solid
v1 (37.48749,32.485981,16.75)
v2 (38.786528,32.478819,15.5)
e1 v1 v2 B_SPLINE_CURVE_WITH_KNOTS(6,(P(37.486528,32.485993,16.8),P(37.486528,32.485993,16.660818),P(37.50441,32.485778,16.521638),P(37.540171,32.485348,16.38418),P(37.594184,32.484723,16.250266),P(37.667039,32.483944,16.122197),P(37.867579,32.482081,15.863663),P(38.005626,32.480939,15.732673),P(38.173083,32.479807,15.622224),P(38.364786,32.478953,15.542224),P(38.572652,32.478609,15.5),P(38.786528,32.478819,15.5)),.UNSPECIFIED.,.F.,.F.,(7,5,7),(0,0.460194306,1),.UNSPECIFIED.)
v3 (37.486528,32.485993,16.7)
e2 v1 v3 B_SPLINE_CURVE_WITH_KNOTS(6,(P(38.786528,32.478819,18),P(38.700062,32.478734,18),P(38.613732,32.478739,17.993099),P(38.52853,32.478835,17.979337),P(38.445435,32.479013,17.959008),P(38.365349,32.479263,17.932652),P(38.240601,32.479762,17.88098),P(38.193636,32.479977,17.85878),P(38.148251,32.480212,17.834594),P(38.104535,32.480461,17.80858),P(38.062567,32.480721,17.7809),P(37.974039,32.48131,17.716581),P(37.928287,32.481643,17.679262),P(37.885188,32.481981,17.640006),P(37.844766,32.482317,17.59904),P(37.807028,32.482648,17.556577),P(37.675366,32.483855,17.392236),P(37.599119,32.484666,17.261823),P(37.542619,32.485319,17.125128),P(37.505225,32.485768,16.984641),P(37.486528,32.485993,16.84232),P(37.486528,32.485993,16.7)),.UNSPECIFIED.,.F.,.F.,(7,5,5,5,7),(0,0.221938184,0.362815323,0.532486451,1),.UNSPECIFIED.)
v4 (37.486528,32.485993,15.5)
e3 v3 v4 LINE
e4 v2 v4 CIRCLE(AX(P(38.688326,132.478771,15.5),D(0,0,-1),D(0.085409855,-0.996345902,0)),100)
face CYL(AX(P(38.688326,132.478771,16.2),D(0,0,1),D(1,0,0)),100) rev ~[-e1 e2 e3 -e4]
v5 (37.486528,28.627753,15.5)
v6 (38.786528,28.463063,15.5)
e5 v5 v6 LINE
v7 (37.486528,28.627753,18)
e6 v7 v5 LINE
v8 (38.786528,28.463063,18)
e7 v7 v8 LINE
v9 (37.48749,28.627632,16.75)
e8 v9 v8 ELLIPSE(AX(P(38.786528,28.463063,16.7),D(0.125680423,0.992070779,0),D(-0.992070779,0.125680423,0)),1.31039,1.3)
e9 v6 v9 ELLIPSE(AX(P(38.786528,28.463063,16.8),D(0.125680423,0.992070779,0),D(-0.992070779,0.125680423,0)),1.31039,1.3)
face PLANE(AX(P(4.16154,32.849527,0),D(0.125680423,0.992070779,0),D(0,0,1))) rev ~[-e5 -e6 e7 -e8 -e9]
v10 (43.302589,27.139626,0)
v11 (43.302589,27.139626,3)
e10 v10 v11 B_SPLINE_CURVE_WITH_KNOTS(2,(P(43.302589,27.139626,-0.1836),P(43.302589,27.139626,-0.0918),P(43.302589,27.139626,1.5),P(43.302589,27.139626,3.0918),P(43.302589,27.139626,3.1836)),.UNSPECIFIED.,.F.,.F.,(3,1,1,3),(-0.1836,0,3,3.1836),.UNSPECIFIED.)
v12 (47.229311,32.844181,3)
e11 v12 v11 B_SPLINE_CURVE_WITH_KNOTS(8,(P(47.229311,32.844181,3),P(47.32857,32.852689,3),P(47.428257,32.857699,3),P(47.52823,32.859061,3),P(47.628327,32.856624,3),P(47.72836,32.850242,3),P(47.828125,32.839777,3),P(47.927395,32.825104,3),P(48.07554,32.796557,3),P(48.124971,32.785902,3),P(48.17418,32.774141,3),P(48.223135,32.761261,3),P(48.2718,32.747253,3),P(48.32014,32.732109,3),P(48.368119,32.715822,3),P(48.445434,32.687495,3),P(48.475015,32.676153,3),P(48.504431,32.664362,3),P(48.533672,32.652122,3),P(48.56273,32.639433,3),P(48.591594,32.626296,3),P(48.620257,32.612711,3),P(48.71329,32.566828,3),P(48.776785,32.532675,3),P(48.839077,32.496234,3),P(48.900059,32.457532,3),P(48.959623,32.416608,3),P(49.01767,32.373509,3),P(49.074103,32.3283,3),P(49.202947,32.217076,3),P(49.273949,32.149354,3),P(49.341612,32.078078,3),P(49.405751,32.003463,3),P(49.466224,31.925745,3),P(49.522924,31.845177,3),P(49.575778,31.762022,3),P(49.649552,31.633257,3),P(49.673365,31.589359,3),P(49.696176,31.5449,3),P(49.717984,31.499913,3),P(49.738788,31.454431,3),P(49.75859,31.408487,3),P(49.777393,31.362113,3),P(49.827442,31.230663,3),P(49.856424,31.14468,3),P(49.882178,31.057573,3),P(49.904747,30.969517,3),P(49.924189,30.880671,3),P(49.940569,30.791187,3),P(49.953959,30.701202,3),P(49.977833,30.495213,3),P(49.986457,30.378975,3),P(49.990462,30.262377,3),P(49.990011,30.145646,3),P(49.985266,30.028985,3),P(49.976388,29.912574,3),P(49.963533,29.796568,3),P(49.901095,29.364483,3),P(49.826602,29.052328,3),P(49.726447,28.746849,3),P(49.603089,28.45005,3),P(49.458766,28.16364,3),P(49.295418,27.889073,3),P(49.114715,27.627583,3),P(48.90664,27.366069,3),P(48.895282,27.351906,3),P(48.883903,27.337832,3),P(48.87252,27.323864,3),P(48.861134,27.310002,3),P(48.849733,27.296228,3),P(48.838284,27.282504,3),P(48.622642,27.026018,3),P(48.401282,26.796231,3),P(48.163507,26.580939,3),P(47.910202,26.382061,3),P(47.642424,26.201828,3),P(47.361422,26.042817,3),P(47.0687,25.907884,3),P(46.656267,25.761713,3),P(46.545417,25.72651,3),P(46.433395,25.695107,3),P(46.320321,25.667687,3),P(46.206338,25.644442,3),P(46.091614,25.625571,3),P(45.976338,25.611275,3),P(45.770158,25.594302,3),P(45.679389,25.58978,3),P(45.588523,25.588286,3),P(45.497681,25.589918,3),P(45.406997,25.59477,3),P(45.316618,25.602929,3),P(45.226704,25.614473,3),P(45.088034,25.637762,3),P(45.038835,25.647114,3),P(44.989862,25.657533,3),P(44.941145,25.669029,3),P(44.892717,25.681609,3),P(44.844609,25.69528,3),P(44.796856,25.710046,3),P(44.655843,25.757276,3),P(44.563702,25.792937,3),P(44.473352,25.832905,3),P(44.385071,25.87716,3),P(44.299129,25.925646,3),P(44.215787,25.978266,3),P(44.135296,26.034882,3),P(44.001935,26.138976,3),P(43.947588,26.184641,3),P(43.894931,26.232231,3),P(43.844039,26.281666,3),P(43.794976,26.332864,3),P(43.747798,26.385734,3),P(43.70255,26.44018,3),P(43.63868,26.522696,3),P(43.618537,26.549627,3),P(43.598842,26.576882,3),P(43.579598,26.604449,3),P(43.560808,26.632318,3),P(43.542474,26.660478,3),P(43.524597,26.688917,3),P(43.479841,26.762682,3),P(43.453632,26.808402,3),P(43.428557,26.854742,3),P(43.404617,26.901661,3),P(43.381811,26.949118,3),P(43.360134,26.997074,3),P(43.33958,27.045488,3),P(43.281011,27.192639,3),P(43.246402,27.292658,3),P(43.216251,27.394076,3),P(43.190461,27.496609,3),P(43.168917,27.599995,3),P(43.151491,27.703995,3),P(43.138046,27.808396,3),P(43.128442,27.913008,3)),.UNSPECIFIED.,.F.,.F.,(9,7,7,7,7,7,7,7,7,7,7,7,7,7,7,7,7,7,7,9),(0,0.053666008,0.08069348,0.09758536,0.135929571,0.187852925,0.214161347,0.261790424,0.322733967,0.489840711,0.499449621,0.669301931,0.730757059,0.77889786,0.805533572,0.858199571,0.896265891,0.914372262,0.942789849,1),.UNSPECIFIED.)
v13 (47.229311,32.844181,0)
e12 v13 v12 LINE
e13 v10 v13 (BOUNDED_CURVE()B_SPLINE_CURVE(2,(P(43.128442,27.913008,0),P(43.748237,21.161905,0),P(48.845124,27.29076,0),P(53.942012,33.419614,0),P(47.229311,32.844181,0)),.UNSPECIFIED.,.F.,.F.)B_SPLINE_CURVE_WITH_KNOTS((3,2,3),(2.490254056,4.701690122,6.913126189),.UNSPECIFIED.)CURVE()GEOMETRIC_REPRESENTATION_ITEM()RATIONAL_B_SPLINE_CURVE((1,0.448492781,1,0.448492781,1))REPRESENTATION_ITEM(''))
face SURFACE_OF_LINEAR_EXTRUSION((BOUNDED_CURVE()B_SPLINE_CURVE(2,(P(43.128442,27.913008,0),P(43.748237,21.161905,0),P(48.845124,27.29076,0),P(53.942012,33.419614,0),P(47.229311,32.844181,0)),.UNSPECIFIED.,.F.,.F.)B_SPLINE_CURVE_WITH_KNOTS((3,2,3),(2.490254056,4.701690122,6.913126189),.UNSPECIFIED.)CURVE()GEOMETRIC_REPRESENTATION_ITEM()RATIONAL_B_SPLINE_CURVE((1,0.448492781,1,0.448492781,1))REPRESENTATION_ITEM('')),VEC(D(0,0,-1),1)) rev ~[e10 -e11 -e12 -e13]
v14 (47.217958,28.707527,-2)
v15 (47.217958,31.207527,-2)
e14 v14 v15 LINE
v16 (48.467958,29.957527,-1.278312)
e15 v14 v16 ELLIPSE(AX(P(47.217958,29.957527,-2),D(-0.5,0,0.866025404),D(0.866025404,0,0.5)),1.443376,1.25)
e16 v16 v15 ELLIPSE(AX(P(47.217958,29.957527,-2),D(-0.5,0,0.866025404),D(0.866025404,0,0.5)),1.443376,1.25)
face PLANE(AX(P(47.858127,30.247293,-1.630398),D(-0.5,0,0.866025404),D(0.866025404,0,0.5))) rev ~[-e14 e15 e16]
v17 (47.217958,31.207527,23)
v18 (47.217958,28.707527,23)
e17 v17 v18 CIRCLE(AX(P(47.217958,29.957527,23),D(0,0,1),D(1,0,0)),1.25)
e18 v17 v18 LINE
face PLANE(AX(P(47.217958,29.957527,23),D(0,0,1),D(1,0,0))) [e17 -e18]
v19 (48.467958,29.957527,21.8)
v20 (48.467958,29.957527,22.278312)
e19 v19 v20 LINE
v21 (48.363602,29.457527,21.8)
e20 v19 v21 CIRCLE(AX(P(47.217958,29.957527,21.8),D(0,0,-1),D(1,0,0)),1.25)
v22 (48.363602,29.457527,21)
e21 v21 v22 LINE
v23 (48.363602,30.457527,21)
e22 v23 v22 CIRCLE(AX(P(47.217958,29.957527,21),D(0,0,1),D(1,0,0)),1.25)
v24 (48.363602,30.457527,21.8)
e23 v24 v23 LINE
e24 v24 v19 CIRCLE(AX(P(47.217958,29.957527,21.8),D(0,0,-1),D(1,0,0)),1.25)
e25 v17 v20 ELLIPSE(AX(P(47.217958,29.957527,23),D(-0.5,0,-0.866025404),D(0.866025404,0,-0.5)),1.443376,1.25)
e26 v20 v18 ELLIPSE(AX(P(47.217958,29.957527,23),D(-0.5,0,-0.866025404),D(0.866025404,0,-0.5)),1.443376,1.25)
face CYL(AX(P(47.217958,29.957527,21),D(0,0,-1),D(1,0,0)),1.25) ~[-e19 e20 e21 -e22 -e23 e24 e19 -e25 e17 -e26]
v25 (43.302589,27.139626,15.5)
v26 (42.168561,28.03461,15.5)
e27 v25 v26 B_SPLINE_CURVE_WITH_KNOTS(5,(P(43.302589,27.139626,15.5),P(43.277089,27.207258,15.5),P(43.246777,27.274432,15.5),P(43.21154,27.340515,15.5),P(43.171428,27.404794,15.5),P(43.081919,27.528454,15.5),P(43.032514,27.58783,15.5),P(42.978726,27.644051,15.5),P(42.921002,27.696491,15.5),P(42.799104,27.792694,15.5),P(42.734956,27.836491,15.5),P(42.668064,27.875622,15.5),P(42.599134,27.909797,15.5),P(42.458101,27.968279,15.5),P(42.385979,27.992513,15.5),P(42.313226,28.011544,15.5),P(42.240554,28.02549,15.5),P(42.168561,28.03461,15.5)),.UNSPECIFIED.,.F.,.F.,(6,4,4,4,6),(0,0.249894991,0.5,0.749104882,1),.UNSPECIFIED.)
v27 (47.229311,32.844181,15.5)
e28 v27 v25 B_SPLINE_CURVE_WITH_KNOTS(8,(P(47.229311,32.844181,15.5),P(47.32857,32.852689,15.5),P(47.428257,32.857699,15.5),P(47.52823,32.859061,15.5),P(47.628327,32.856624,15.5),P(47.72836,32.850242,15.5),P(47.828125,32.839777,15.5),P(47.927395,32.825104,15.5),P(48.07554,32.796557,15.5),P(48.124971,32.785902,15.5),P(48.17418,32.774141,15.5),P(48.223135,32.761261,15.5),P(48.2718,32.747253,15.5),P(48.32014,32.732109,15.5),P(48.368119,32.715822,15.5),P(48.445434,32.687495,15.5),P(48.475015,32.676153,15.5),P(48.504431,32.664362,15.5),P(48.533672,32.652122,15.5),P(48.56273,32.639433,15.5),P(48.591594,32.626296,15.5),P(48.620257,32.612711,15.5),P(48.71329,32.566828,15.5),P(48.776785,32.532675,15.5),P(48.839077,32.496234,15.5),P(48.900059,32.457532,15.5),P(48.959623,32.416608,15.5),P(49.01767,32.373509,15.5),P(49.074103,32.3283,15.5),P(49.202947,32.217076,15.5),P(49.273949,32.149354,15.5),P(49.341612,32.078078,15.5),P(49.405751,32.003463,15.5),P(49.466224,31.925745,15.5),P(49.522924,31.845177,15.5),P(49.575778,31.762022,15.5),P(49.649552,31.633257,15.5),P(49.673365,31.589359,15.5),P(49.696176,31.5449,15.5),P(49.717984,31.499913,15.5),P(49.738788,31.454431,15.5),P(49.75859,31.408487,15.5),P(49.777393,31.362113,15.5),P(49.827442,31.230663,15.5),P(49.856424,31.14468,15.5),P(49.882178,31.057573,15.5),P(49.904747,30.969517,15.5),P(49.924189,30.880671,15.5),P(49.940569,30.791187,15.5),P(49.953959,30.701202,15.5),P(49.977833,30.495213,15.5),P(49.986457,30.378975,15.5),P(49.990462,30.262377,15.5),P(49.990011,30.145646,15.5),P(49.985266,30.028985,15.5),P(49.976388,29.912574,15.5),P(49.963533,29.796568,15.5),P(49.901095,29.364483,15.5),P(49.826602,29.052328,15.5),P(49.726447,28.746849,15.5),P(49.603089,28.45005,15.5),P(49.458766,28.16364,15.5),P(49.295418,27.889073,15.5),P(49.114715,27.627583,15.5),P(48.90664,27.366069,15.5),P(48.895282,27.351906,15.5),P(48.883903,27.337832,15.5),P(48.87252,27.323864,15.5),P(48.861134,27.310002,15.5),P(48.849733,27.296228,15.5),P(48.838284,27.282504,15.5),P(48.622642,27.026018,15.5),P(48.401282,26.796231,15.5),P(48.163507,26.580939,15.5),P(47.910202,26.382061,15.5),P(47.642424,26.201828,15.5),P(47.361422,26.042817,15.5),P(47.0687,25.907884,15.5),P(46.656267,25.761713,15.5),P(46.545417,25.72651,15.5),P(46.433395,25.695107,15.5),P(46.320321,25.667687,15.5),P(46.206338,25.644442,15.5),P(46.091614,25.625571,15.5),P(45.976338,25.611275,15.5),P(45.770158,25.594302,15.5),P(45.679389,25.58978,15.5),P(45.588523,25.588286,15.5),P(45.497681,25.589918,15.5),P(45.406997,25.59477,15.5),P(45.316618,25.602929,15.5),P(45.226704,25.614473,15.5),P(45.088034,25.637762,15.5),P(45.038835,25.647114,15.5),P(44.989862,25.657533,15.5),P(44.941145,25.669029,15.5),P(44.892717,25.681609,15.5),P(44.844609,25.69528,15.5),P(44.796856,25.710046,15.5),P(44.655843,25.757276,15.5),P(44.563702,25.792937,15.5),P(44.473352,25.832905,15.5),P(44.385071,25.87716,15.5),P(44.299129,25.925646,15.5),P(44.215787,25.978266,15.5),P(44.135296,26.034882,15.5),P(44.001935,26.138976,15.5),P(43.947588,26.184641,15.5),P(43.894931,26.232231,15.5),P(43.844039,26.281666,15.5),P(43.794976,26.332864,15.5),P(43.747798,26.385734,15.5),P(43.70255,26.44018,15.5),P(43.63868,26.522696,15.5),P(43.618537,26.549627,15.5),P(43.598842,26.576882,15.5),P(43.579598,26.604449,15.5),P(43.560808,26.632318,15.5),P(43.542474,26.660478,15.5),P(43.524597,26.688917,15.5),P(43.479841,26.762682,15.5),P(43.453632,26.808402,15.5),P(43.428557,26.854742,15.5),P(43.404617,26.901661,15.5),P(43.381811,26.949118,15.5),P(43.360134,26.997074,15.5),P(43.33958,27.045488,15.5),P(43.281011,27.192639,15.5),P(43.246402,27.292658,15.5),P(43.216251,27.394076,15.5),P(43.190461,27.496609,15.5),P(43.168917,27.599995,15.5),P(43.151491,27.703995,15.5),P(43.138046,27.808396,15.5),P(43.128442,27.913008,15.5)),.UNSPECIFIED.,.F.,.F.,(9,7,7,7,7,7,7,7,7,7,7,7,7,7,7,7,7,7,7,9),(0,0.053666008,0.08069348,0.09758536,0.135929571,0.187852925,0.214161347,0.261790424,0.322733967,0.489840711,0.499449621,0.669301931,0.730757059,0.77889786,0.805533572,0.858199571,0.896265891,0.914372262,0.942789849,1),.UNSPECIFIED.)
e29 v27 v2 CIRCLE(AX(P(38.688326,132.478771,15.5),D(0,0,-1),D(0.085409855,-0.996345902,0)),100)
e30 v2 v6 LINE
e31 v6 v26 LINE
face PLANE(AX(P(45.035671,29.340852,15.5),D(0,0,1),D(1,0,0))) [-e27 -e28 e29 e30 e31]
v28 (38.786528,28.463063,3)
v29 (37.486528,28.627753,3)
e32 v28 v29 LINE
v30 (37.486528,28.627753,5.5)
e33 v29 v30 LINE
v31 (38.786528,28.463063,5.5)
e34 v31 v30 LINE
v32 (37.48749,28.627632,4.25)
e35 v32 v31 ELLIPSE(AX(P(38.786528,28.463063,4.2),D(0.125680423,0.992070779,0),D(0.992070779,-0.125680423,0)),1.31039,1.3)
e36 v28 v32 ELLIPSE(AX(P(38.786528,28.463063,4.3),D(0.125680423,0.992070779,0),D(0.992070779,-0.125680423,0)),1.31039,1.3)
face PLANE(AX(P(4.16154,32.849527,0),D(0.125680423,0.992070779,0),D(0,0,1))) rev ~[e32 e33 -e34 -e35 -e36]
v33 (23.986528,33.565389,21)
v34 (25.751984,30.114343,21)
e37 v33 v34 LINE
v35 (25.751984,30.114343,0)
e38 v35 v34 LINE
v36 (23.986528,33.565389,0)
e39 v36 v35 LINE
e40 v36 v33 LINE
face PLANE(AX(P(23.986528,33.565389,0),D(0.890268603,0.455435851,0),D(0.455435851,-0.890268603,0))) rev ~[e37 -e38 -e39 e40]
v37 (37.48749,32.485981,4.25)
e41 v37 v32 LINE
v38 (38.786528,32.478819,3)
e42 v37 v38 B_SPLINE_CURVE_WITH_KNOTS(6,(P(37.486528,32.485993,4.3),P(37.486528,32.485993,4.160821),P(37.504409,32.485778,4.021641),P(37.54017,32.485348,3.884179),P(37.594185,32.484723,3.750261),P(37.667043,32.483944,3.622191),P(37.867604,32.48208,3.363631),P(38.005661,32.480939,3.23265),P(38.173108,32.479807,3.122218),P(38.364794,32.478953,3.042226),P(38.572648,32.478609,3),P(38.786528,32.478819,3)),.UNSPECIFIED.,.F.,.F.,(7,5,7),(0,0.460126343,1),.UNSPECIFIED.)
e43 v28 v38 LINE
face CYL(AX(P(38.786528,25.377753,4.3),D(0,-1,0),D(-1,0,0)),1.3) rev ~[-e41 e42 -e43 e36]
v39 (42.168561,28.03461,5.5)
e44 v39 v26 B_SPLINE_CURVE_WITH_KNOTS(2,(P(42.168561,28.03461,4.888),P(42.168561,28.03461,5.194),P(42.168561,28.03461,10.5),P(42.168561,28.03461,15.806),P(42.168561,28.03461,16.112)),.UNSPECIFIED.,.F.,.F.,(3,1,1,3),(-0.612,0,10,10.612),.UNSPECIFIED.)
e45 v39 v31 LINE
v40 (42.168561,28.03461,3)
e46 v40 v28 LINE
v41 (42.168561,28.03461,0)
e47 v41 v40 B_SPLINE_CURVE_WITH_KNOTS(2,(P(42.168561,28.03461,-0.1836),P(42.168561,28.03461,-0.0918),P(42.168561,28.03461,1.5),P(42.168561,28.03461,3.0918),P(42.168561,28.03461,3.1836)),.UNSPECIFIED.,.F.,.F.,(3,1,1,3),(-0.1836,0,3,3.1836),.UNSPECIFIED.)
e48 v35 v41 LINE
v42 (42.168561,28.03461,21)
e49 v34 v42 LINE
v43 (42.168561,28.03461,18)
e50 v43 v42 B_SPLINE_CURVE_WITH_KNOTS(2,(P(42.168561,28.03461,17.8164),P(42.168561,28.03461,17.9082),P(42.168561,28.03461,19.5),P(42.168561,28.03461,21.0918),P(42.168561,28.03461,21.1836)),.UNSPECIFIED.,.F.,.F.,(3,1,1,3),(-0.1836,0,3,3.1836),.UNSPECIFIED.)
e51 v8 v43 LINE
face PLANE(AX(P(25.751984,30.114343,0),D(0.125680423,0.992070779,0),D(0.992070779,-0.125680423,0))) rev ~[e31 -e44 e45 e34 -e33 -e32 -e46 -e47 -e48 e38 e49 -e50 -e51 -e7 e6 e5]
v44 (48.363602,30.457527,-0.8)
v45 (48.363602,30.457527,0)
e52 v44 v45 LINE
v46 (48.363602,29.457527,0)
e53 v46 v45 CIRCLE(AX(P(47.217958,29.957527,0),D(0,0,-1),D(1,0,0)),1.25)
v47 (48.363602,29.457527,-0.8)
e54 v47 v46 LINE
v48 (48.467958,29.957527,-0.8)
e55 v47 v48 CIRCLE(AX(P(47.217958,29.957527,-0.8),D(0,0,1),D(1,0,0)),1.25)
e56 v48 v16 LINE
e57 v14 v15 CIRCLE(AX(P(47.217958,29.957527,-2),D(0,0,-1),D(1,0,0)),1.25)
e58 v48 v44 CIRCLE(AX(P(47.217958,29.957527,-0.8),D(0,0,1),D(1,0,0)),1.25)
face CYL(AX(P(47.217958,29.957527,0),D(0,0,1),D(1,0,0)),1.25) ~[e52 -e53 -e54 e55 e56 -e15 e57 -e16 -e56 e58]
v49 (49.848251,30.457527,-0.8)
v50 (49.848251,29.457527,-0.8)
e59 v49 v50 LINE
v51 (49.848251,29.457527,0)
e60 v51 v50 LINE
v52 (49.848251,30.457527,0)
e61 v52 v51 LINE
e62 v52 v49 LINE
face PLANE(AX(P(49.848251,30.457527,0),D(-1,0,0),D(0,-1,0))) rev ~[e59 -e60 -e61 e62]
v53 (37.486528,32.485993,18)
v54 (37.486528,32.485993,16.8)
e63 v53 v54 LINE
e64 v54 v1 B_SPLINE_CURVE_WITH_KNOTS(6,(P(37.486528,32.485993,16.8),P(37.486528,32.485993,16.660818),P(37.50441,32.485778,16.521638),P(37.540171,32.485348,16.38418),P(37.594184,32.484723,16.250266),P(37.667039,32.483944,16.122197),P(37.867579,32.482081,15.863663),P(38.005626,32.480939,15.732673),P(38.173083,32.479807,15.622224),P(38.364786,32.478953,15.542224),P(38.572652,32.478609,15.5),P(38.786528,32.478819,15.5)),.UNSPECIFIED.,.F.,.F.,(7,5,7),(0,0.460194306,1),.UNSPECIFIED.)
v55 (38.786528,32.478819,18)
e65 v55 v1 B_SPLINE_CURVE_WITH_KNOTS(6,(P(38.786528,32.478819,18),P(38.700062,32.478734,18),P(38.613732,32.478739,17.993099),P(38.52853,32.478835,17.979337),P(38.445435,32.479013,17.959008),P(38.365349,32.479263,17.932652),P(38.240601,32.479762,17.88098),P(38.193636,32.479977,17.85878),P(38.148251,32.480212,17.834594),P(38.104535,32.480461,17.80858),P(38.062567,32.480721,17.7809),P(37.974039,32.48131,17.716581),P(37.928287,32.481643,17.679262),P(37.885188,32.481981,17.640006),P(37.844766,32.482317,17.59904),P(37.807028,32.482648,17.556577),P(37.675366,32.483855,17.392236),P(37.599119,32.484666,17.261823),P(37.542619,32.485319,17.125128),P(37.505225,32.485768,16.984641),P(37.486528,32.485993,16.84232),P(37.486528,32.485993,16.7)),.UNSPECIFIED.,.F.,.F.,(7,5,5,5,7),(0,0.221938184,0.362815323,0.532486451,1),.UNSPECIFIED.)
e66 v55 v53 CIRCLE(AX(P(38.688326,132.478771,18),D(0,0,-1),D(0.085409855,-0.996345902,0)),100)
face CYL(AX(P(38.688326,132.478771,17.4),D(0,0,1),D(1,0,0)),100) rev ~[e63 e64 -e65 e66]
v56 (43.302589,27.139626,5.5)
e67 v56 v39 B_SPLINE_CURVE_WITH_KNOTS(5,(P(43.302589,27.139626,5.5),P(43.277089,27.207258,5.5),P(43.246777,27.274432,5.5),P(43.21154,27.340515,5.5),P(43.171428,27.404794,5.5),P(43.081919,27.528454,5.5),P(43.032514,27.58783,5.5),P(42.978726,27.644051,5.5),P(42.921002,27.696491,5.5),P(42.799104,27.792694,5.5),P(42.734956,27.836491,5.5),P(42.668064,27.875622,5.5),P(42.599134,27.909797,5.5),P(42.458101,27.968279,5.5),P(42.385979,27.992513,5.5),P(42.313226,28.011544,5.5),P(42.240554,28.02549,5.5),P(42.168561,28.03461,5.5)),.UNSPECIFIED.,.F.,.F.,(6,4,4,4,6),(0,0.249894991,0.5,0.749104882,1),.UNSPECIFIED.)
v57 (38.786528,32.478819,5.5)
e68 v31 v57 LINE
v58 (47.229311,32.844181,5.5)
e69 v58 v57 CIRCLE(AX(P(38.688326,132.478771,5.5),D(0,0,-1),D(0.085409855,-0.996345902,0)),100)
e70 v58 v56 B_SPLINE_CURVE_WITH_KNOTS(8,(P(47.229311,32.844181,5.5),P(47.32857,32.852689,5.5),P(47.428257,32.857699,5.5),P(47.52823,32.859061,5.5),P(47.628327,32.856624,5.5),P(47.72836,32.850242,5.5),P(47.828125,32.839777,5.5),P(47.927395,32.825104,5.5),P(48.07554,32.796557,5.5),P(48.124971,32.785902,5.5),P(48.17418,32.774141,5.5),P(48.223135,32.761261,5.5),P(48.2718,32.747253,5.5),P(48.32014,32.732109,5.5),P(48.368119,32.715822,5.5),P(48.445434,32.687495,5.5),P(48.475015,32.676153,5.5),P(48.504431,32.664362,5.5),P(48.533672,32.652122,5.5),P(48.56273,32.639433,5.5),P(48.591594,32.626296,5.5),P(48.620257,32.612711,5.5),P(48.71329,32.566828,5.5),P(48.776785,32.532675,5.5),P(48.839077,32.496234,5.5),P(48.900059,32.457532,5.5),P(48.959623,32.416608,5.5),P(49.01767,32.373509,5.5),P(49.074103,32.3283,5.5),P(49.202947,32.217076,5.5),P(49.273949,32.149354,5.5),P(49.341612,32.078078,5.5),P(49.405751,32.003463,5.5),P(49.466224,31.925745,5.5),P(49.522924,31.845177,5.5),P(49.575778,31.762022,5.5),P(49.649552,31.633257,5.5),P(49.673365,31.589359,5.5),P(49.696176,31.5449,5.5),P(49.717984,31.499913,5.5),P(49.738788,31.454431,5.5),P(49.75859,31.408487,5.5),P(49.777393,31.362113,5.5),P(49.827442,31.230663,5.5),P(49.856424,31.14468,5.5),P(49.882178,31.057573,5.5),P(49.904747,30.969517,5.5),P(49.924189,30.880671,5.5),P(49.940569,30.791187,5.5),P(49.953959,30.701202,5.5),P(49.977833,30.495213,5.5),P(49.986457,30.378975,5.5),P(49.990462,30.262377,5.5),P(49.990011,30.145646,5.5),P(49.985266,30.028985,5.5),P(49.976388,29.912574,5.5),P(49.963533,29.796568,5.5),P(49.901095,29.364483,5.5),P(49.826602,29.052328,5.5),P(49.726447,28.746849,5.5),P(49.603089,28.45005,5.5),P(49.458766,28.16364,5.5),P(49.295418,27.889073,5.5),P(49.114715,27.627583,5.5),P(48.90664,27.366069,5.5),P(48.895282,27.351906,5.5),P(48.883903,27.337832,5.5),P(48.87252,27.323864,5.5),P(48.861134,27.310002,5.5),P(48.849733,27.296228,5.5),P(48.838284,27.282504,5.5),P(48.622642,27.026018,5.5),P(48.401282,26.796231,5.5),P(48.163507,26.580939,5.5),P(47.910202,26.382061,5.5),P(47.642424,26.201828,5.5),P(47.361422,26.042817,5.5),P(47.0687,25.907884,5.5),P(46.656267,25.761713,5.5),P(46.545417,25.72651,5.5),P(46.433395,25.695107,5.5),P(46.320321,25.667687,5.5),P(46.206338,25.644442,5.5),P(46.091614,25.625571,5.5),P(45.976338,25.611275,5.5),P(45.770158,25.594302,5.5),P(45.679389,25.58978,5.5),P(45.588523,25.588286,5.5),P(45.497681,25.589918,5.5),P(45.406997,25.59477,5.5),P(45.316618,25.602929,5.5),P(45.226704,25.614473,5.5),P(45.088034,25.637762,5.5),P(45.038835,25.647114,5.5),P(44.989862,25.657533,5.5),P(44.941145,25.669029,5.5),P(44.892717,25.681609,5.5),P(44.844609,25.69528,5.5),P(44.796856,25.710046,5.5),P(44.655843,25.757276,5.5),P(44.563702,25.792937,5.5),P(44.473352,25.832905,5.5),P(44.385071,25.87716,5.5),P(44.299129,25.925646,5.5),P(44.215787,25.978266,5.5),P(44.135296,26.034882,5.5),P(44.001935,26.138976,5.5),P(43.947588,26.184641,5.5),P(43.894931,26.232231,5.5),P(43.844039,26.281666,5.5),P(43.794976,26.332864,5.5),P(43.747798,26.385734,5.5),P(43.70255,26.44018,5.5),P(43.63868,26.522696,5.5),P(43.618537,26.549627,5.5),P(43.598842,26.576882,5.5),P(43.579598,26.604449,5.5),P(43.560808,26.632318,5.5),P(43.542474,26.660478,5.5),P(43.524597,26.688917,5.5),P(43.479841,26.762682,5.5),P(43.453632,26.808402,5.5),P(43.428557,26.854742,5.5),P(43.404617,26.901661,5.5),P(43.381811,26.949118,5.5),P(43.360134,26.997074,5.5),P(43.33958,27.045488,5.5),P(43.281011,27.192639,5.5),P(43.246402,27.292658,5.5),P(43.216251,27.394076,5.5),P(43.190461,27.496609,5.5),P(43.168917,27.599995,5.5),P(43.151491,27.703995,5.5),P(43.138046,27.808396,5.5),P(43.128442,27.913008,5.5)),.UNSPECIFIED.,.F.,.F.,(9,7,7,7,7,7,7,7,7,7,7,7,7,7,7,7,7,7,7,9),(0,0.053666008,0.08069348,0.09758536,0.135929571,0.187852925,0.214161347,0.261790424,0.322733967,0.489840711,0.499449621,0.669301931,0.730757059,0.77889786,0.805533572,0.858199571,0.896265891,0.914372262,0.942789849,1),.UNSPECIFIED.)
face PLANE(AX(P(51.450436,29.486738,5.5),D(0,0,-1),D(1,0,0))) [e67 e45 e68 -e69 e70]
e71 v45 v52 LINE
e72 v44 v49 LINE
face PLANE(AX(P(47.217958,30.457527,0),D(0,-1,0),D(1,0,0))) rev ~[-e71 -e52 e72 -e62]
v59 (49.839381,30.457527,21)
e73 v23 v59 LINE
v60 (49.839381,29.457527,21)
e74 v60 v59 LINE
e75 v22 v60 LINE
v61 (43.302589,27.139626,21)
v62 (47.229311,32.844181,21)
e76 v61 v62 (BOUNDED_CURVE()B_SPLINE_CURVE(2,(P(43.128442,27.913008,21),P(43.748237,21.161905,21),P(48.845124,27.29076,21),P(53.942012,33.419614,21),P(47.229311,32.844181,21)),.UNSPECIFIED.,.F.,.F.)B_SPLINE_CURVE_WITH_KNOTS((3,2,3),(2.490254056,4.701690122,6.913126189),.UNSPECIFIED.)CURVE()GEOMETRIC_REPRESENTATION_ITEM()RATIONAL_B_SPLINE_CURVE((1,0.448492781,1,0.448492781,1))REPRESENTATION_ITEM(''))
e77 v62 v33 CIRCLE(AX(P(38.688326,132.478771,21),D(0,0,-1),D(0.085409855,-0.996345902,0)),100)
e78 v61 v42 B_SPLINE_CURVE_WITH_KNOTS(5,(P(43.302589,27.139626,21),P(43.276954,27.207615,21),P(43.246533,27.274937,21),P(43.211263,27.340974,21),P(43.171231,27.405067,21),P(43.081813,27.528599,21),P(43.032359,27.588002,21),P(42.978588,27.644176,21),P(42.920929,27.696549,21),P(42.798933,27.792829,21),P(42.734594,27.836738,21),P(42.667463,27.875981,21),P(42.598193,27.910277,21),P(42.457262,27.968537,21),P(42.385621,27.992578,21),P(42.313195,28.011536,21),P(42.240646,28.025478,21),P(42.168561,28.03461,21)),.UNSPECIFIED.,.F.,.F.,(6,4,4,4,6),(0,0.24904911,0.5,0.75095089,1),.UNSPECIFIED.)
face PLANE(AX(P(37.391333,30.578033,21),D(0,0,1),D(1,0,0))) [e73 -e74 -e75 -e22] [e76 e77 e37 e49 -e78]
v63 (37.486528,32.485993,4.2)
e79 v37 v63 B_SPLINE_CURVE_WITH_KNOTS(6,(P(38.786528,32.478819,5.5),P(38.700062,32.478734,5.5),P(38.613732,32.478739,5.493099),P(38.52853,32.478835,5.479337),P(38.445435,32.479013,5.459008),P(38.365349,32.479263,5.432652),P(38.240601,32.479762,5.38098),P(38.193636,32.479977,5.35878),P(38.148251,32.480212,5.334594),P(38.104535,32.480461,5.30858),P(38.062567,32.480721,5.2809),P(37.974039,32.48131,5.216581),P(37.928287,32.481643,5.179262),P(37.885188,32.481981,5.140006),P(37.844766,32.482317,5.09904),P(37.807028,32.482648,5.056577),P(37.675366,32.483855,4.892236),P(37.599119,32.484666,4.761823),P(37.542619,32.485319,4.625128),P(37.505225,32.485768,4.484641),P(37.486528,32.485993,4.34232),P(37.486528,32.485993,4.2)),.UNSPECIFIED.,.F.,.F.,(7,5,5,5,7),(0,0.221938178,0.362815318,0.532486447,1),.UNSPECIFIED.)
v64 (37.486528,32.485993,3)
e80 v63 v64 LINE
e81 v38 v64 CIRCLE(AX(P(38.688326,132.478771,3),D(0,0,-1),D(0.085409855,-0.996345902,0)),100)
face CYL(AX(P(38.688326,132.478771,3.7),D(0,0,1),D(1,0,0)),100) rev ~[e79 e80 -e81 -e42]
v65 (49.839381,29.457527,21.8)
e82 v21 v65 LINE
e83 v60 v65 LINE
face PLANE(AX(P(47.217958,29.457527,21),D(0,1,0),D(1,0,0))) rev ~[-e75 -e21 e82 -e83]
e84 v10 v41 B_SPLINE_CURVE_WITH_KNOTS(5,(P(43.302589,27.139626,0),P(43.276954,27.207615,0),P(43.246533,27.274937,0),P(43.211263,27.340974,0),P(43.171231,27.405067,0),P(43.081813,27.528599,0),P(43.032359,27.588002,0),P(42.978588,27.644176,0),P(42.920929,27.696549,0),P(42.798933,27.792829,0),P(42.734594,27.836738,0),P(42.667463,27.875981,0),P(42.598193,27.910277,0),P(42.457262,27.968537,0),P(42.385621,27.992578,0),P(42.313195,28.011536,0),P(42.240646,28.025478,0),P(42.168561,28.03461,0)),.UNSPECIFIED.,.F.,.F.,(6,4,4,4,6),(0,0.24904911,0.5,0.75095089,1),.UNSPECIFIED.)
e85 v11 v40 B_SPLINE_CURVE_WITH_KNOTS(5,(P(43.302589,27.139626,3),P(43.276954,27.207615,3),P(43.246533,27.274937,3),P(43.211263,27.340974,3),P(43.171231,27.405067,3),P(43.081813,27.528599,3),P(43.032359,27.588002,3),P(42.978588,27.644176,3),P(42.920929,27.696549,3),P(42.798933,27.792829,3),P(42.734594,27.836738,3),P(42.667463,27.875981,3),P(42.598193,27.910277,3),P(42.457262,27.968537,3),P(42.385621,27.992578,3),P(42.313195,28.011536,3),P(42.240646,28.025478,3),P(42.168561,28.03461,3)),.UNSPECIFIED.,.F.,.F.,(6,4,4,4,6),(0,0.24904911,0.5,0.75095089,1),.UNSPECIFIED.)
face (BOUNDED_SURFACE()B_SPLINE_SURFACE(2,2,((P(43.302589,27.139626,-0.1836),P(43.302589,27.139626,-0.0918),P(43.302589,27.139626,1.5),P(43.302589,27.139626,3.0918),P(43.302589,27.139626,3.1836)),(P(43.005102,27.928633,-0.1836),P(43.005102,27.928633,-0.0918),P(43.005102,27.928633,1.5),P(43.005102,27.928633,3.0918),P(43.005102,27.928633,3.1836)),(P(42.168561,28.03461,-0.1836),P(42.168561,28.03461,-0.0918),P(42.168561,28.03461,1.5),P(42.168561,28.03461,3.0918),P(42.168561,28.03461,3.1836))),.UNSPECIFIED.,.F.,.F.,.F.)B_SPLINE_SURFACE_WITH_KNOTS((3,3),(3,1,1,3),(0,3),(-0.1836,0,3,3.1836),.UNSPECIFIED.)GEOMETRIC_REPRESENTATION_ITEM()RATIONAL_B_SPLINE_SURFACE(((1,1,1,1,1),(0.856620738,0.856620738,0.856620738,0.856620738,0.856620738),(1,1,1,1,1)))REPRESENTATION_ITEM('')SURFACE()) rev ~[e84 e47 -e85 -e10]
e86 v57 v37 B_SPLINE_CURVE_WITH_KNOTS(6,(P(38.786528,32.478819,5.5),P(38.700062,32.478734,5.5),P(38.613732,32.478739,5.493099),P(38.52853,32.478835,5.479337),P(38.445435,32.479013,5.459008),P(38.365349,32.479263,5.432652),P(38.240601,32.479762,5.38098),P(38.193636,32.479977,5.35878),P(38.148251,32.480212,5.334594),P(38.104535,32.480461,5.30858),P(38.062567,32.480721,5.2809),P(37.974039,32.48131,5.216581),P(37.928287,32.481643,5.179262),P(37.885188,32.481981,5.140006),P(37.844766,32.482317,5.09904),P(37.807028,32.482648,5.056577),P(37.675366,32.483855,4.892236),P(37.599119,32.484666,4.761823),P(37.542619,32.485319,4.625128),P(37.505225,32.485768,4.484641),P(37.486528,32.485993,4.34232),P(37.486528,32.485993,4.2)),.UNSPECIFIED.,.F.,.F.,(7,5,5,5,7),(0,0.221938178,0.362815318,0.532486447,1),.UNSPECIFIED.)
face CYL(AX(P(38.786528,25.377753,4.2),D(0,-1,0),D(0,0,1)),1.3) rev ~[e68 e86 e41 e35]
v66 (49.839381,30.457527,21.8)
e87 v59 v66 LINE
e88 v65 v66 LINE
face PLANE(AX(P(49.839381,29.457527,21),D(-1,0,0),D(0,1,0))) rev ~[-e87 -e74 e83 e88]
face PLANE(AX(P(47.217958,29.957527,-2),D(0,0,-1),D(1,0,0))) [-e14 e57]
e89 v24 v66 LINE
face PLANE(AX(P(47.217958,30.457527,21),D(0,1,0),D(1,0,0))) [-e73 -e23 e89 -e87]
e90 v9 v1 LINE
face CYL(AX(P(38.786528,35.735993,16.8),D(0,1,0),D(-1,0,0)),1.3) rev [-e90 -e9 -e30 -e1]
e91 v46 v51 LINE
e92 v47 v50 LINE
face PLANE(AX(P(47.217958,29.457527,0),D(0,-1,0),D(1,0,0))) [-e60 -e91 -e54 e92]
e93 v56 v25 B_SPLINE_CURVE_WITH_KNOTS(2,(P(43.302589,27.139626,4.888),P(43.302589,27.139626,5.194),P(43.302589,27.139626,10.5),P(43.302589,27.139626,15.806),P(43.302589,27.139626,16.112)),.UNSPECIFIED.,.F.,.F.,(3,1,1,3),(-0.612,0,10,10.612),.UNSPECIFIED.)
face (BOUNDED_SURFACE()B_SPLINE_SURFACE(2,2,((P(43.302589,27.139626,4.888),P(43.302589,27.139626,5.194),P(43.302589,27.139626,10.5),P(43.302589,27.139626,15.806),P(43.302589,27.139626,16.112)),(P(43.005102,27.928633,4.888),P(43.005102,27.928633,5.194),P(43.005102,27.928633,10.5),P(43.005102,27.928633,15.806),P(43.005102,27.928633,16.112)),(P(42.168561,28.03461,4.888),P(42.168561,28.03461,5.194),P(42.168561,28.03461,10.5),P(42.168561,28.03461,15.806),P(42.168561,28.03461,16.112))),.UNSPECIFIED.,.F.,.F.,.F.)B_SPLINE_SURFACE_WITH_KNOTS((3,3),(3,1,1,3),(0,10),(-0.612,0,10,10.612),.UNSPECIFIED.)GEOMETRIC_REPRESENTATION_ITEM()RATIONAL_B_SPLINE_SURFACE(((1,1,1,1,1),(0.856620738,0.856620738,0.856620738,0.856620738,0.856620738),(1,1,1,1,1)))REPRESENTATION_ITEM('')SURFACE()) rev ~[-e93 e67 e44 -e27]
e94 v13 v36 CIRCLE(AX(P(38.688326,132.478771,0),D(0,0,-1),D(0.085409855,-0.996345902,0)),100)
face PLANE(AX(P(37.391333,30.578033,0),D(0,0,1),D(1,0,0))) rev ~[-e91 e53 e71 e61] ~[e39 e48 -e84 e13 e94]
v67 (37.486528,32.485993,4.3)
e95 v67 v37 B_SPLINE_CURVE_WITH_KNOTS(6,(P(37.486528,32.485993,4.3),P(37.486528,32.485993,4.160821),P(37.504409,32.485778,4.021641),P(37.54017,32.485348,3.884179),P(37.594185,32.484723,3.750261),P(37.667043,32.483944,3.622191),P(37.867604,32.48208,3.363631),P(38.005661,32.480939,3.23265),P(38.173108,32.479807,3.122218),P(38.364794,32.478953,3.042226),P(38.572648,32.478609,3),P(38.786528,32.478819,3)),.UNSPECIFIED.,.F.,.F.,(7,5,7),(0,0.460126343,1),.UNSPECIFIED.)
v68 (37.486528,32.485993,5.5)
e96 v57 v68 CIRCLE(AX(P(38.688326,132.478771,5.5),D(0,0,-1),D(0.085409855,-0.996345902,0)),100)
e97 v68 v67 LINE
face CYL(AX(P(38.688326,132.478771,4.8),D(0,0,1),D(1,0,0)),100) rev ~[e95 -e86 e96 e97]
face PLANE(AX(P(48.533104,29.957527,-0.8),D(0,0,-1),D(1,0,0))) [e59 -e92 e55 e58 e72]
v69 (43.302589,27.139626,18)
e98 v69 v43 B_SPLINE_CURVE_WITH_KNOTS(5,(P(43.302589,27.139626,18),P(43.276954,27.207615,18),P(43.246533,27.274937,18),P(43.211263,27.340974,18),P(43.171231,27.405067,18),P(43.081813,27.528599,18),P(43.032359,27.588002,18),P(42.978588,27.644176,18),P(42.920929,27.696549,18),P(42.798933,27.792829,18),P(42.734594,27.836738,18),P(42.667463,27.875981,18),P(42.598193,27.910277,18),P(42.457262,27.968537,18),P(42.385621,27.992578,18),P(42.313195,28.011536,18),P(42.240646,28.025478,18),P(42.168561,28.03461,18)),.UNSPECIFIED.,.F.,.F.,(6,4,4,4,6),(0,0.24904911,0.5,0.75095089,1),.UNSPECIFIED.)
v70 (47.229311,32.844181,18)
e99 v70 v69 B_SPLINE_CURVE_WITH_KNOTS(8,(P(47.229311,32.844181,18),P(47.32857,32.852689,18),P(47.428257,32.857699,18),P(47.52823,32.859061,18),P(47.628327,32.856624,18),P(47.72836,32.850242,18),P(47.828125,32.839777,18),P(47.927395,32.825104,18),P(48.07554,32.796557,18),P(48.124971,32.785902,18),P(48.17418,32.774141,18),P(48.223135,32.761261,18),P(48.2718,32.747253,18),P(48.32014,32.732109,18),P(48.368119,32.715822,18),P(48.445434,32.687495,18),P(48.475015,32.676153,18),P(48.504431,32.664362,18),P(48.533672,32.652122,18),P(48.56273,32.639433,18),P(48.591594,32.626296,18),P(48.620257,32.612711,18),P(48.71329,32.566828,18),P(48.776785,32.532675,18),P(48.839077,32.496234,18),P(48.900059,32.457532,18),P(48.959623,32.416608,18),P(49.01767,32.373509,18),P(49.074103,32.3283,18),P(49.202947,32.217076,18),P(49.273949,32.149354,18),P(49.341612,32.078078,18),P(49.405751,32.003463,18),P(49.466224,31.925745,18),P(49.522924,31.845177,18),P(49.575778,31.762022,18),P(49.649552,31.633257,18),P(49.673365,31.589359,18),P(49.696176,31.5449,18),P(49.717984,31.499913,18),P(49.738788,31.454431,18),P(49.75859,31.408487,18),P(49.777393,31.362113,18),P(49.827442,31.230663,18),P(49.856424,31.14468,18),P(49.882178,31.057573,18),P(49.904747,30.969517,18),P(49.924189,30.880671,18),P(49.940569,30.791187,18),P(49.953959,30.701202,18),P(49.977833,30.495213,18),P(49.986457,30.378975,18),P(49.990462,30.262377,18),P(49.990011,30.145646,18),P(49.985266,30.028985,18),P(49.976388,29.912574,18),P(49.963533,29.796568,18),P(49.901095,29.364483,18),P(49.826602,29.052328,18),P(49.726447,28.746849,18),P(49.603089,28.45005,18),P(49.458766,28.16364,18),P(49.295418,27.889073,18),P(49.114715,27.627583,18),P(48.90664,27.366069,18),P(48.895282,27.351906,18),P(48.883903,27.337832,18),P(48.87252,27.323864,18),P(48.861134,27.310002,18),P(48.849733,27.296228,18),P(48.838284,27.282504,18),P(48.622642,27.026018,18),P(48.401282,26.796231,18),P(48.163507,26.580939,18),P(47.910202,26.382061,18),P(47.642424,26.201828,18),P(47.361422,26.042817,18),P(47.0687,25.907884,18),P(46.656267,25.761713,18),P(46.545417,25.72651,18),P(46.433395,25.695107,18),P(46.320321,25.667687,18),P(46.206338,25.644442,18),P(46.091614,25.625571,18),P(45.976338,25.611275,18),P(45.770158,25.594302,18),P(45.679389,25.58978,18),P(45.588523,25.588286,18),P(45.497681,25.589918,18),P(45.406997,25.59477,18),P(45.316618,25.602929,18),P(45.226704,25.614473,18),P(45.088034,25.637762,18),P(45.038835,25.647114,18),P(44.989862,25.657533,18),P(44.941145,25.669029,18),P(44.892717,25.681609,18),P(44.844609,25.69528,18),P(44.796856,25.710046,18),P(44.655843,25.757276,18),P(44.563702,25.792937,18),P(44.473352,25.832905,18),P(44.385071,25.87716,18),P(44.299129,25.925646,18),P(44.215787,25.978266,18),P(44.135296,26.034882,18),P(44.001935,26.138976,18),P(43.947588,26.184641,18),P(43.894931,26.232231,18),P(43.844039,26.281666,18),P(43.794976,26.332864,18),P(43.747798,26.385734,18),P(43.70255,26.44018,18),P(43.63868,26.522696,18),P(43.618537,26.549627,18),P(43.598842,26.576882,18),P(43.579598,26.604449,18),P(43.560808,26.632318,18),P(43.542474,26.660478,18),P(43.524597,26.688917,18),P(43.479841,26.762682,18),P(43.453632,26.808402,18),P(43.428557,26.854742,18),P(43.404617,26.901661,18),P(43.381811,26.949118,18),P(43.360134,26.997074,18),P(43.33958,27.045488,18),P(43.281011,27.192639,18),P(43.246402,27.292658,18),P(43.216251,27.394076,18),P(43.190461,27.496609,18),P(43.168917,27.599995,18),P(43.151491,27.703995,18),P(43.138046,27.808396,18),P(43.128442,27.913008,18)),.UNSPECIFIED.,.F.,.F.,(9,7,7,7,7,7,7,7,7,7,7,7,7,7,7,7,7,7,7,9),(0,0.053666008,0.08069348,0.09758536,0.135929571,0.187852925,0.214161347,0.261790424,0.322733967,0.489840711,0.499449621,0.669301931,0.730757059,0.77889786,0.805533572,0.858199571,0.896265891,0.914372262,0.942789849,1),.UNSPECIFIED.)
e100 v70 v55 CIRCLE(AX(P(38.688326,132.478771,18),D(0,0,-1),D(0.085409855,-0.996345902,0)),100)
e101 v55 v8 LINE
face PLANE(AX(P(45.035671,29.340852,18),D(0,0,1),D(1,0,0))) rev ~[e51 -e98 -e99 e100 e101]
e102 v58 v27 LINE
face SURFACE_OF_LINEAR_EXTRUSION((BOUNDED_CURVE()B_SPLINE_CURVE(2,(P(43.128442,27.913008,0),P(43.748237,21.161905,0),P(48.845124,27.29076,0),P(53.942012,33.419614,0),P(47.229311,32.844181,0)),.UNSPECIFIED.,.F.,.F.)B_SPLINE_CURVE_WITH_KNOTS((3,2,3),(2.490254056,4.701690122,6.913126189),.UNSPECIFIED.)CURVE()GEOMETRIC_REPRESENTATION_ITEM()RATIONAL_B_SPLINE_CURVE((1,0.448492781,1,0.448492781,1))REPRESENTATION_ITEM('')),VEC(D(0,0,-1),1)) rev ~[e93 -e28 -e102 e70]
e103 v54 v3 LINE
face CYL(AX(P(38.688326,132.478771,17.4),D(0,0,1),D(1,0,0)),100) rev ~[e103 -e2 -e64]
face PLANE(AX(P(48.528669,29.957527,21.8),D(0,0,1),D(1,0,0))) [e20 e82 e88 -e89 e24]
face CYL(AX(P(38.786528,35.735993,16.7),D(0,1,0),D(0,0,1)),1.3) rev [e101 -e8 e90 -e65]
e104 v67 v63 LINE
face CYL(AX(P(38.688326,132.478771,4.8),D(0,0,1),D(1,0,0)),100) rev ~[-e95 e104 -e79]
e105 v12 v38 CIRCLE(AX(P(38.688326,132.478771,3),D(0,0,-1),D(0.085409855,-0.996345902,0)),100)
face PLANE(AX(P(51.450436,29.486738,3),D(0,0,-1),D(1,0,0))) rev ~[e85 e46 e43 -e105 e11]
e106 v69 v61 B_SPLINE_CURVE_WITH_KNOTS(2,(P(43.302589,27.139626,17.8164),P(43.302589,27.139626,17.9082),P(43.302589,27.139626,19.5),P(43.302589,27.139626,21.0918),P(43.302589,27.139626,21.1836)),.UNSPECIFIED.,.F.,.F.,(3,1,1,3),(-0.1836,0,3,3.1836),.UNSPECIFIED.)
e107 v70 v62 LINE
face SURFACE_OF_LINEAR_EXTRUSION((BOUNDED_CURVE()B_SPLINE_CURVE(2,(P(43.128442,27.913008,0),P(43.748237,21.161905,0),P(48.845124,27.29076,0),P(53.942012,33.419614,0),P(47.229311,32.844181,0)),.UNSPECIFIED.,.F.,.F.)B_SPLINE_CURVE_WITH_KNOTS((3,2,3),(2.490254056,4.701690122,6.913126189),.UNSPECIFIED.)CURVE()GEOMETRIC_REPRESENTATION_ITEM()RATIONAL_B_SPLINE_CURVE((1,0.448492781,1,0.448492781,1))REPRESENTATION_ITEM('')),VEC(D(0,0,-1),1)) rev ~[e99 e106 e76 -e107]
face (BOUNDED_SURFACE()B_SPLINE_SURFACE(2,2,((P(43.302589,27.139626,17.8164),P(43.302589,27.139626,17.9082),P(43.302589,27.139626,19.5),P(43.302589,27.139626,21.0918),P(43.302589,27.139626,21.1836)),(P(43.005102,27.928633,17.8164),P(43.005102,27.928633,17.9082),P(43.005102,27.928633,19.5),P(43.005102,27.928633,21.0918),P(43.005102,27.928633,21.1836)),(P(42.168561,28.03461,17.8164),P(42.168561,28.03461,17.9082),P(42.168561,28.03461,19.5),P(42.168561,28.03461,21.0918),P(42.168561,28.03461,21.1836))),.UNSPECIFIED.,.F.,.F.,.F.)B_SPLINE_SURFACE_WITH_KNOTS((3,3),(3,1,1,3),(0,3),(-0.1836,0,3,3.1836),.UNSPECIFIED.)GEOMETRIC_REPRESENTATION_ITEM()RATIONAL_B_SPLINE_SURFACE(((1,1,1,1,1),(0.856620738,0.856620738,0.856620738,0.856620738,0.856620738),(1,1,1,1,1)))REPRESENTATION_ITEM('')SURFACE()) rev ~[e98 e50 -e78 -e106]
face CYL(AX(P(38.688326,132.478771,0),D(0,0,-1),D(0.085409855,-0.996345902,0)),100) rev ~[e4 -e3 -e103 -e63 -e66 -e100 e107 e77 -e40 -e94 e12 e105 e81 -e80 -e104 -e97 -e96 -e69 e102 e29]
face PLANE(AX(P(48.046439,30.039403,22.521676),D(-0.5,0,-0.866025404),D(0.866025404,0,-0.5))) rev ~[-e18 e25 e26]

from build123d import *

# Parameters (mm, degrees)
F1_DEPTH     = 21
F3_W         = 15.0982862345
F3_H         = 25.1671721393
F4_DEPTH     = 2.5
F6_W         = 27.927816356
F6_H         = 22.3754025899
F7_DEPTH     = 2.5
F8_T4_DEPTH  = 10.3582394023
F8_S5_R      = 100
F8_T6_DEPTH  = 7
F8_T11_DEPTH = 10.3582394023
F8_S12_R     = 100
F8_T13_DEPTH = 7
F8_T18_DEPTH = 10.3582394023
F8_S19_R     = 100
F8_T20_DEPTH = 7
F8_T25_DEPTH = 10.3582394023
F8_S26_R     = 100
F8_T27_DEPTH = 7
F9_R         = 1.4
F10_R        = 1.25
F11_DEPTH    = 2
F13_R        = 1.25
F14_DEPTH    = 2
F17_W        = 1.492921263
F17_H        = 4.4254288077
F18_DEPTH    = 25
F21_W        = 1.9132951934
F21_H        = 3.2676104456
F22_DEPTH    = 25
F23_W        = 2.6214234531
F23_H        = 1
F24_DEPTH    = 0.8
F25_W        = 2.6302933693
F25_H        = 1
F26_DEPTH    = 0.8


# Not quite as in the source:
# - a fillet or chamfer that OpenCascade refuses, or shapes differently, is made with other operations: its cross-section is extruded or revolved along the edge and cut away or added


with BuildPart() as f1:
    # F0 (on Top) → F1 (new body)
    with BuildSketch(Plane.XY):
        with BuildLine():
            Line((25.7519837469, 30.1143433899), (43.1284420192, 27.9130078852))
            add(Edge.make_bspline(
                [(43.1284420192, 27.9130078852), (43.748237159, 21.1619048692), (48.845124386, 27.2907595332), (53.9420116129, 33.4196141972), (47.2293113268, 32.8441807488)],
                knots=[2.4902540559, 2.4902540559, 2.4902540559, 4.7016901225, 4.7016901225, 6.9131261892, 6.9131261892, 6.9131261892], degree=2, weights=[1, 0.4484927805, 1, 0.4484927805, 1]))
            ThreePointArc((47.2293113268, 32.8441807488), (35.5868846063, 32.5268772196), (23.9865279377, 33.5653889592))
            Line((23.9865279377, 33.5653889592), (25.7519837469, 30.1143433899))
        make_face()
    extrude(amount=F1_DEPTH)

    # F3 (on offset) → F4 (cut)
    with BuildSketch(Plane.XY.offset(18)):
        with Locations((45.0356710549, 29.340852052)):
            Rectangle(F3_W, F3_H)
    extrude(amount=-F4_DEPTH, mode=Mode.SUBTRACT)

    # F6 (on offset) → F7 (cut)
    with BuildSketch(Plane(origin=(0, 0, 3), x_dir=(1, 0, 0), z_dir=(0, 0, -1))):
        with Locations((51.4504361157, -29.4867381454)):
            Rectangle(F6_W, F6_H)
    extrude(amount=-F7_DEPTH, mode=Mode.SUBTRACT)

    # F8: fillet of radius 1.3 on 4 edges, made by hand


with BuildPart() as f8_tool2:
    # F8_s3 → F8_t4 (new body)
    with BuildSketch(Plane.XZ.offset(-25.3777534097)):
        with BuildLine():
            ThreePointArc((38.7865279377, 5.5), (37.8672891221, 5.1192388155), (37.4865279377, 4.2))
            Line((37.4865279377, 4.2), (37.4865279377, 5.5))
            Line((37.4865279377, 5.5), (38.7865279377, 5.5))
        make_face()
    extrude(amount=-F8_T4_DEPTH)

    # F8_s5 → F8_t6 (cut, symmetric)
    with BuildSketch(Plane.XY.offset(4.8)):
        with Locations((38.6883258238, 132.4787709604)):
            Circle(F8_S5_R)
    extrude(amount=F8_T6_DEPTH, both=True, mode=Mode.SUBTRACT)

    split(bisect_by=Plane(origin=(4.1615402697, 32.8495273406, 0), x_dir=(0, 0, 1), z_dir=(0.1256804232, 0.9920707793, 0)), keep=Keep.TOP)


with BuildPart() as f1_1:
    add(f1.part)

    # F8_t1: union F8_tool2
    add(f8_tool2.part)


with BuildPart() as f8_tool9:
    # F8_s10 → F8_t11 (new body)
    with BuildSketch(Plane.XZ.offset(-35.735992812)):
        with BuildLine():
            ThreePointArc((38.7865279377, 18), (37.8672891221, 17.6192388155), (37.4865279377, 16.7))
            Line((37.4865279377, 16.7), (37.4865279377, 18))
            Line((37.4865279377, 18), (38.7865279377, 18))
        make_face()
    extrude(amount=F8_T11_DEPTH)

    # F8_s12 → F8_t13 (cut, symmetric)
    with BuildSketch(Plane.XY.offset(17.4)):
        with Locations((38.6883258238, 132.4787709604)):
            Circle(F8_S12_R)
    extrude(amount=F8_T13_DEPTH, both=True, mode=Mode.SUBTRACT)

    split(bisect_by=Plane(origin=(4.1615402697, 32.8495273406, 0), x_dir=(0, 0, 1), z_dir=(0.1256804232, 0.9920707793, 0)), keep=Keep.TOP)


with BuildPart() as f1_2:
    add(f1_1.part)

    # F8_t8: union F8_tool9
    add(f8_tool9.part)


with BuildPart() as f8_tool16:
    # F8_s17 → F8_t18 (new body)
    with BuildSketch(Plane.XZ.offset(-25.3777534097)):
        with BuildLine():
            ThreePointArc((37.4865279377, 4.3), (37.8672891221, 3.3807611845), (38.7865279377, 3))
            Line((38.7865279377, 3), (37.4865279377, 3))
            Line((37.4865279377, 3), (37.4865279377, 4.3))
        make_face()
    extrude(amount=-F8_T18_DEPTH)

    # F8_s19 → F8_t20 (cut, symmetric)
    with BuildSketch(Plane.XY.offset(3.7)):
        with Locations((38.6883258238, 132.4787709604)):
            Circle(F8_S19_R)
    extrude(amount=F8_T20_DEPTH, both=True, mode=Mode.SUBTRACT)

    split(bisect_by=Plane(origin=(4.1615402697, 32.8495273406, 0), x_dir=(0, 0, 1), z_dir=(0.1256804232, 0.9920707793, 0)), keep=Keep.TOP)


with BuildPart() as f1_3:
    add(f1_2.part)

    # F8_t15: union F8_tool16
    add(f8_tool16.part)


with BuildPart() as f8_tool23:
    # F8_s24 → F8_t25 (new body)
    with BuildSketch(Plane.XZ.offset(-35.735992812)):
        with BuildLine():
            ThreePointArc((37.4865279377, 16.8), (37.8672891221, 15.8807611845), (38.7865279377, 15.5))
            Line((38.7865279377, 15.5), (37.4865279377, 15.5))
            Line((37.4865279377, 15.5), (37.4865279377, 16.8))
        make_face()
    extrude(amount=F8_T25_DEPTH)

    # F8_s26 → F8_t27 (cut, symmetric)
    with BuildSketch(Plane.XY.offset(16.2)):
        with Locations((38.6883258238, 132.4787709604)):
            Circle(F8_S26_R)
    extrude(amount=F8_T27_DEPTH, both=True, mode=Mode.SUBTRACT)

    split(bisect_by=Plane(origin=(4.1615402697, 32.8495273406, 0), x_dir=(0, 0, 1), z_dir=(0.1256804232, 0.9920707793, 0)), keep=Keep.TOP)


with BuildPart() as f1_4:
    add(f1_3.part)

    # F8_t22: union F8_tool23
    add(f8_tool23.part)

    # F9
    f9_edges = [f1_4.edges().sort_by_distance(p)[0] for p in [
        (43.128442, 27.913008, 19.5),
        (43.128442, 27.913008, 10.5),
        (43.128442, 27.913008, 1.5),
    ]]
    fillet(f9_edges, radius=F9_R)

    # F10 (on face) → F11 (join)
    with BuildSketch(Plane.XY.offset(21)):
        with Locations((47.2179576755, 29.9575272948)):
            Circle(F10_R)
    extrude(amount=F11_DEPTH)

    # F13 (on face) → F14 (join)
    with BuildSketch(Plane(origin=(0, 0, 0), x_dir=(1, 0, 0), z_dir=(0, 0, -1))):
        with Locations((47.2179576755, -29.9575272948)):
            Circle(F13_R)
    extrude(amount=F14_DEPTH)

    # F17 (on line) → F18 (cut)
    with BuildSketch(Plane(origin=(12.6705148226, 0, -21.9459754309), x_dir=(0.8660254038, 0, 0.5), z_dir=(-0.5, 0, 0.8660254038))):
        with Locations((40.6311545521, 30.2472934127)):
            Rectangle(F17_W, F17_H)
    extrude(amount=-F18_DEPTH, mode=Mode.SUBTRACT)

    # F21 (on line) → F22 (cut)
    with BuildSketch(Plane(origin=(21.7637815624, 0, 37.6959754309), x_dir=(0.8660254038, 0, -0.5), z_dir=(-0.5, 0, -0.8660254038))):
        with Locations((30.3485984584, -30.0394026563)):
            Rectangle(F21_W, F21_H)
    extrude(amount=-F22_DEPTH, mode=Mode.SUBTRACT)

    # F23 (on face) → F24 (join)
    with BuildSketch(Plane.XY.offset(21)):
        with Locations((48.528669402, 29.9575272948)):
            Rectangle(F23_W, F23_H)
    extrude(amount=F24_DEPTH)

    # F25 (on face) → F26 (join)
    with BuildSketch(Plane(origin=(0, 0, 0), x_dir=(1, 0, 0), z_dir=(0, 0, -1))):
        with Locations((48.5331043601, -29.9575272948)):
            Rectangle(F25_W, F25_H)
    extrude(amount=F26_DEPTH)


solid = f1_4.part
